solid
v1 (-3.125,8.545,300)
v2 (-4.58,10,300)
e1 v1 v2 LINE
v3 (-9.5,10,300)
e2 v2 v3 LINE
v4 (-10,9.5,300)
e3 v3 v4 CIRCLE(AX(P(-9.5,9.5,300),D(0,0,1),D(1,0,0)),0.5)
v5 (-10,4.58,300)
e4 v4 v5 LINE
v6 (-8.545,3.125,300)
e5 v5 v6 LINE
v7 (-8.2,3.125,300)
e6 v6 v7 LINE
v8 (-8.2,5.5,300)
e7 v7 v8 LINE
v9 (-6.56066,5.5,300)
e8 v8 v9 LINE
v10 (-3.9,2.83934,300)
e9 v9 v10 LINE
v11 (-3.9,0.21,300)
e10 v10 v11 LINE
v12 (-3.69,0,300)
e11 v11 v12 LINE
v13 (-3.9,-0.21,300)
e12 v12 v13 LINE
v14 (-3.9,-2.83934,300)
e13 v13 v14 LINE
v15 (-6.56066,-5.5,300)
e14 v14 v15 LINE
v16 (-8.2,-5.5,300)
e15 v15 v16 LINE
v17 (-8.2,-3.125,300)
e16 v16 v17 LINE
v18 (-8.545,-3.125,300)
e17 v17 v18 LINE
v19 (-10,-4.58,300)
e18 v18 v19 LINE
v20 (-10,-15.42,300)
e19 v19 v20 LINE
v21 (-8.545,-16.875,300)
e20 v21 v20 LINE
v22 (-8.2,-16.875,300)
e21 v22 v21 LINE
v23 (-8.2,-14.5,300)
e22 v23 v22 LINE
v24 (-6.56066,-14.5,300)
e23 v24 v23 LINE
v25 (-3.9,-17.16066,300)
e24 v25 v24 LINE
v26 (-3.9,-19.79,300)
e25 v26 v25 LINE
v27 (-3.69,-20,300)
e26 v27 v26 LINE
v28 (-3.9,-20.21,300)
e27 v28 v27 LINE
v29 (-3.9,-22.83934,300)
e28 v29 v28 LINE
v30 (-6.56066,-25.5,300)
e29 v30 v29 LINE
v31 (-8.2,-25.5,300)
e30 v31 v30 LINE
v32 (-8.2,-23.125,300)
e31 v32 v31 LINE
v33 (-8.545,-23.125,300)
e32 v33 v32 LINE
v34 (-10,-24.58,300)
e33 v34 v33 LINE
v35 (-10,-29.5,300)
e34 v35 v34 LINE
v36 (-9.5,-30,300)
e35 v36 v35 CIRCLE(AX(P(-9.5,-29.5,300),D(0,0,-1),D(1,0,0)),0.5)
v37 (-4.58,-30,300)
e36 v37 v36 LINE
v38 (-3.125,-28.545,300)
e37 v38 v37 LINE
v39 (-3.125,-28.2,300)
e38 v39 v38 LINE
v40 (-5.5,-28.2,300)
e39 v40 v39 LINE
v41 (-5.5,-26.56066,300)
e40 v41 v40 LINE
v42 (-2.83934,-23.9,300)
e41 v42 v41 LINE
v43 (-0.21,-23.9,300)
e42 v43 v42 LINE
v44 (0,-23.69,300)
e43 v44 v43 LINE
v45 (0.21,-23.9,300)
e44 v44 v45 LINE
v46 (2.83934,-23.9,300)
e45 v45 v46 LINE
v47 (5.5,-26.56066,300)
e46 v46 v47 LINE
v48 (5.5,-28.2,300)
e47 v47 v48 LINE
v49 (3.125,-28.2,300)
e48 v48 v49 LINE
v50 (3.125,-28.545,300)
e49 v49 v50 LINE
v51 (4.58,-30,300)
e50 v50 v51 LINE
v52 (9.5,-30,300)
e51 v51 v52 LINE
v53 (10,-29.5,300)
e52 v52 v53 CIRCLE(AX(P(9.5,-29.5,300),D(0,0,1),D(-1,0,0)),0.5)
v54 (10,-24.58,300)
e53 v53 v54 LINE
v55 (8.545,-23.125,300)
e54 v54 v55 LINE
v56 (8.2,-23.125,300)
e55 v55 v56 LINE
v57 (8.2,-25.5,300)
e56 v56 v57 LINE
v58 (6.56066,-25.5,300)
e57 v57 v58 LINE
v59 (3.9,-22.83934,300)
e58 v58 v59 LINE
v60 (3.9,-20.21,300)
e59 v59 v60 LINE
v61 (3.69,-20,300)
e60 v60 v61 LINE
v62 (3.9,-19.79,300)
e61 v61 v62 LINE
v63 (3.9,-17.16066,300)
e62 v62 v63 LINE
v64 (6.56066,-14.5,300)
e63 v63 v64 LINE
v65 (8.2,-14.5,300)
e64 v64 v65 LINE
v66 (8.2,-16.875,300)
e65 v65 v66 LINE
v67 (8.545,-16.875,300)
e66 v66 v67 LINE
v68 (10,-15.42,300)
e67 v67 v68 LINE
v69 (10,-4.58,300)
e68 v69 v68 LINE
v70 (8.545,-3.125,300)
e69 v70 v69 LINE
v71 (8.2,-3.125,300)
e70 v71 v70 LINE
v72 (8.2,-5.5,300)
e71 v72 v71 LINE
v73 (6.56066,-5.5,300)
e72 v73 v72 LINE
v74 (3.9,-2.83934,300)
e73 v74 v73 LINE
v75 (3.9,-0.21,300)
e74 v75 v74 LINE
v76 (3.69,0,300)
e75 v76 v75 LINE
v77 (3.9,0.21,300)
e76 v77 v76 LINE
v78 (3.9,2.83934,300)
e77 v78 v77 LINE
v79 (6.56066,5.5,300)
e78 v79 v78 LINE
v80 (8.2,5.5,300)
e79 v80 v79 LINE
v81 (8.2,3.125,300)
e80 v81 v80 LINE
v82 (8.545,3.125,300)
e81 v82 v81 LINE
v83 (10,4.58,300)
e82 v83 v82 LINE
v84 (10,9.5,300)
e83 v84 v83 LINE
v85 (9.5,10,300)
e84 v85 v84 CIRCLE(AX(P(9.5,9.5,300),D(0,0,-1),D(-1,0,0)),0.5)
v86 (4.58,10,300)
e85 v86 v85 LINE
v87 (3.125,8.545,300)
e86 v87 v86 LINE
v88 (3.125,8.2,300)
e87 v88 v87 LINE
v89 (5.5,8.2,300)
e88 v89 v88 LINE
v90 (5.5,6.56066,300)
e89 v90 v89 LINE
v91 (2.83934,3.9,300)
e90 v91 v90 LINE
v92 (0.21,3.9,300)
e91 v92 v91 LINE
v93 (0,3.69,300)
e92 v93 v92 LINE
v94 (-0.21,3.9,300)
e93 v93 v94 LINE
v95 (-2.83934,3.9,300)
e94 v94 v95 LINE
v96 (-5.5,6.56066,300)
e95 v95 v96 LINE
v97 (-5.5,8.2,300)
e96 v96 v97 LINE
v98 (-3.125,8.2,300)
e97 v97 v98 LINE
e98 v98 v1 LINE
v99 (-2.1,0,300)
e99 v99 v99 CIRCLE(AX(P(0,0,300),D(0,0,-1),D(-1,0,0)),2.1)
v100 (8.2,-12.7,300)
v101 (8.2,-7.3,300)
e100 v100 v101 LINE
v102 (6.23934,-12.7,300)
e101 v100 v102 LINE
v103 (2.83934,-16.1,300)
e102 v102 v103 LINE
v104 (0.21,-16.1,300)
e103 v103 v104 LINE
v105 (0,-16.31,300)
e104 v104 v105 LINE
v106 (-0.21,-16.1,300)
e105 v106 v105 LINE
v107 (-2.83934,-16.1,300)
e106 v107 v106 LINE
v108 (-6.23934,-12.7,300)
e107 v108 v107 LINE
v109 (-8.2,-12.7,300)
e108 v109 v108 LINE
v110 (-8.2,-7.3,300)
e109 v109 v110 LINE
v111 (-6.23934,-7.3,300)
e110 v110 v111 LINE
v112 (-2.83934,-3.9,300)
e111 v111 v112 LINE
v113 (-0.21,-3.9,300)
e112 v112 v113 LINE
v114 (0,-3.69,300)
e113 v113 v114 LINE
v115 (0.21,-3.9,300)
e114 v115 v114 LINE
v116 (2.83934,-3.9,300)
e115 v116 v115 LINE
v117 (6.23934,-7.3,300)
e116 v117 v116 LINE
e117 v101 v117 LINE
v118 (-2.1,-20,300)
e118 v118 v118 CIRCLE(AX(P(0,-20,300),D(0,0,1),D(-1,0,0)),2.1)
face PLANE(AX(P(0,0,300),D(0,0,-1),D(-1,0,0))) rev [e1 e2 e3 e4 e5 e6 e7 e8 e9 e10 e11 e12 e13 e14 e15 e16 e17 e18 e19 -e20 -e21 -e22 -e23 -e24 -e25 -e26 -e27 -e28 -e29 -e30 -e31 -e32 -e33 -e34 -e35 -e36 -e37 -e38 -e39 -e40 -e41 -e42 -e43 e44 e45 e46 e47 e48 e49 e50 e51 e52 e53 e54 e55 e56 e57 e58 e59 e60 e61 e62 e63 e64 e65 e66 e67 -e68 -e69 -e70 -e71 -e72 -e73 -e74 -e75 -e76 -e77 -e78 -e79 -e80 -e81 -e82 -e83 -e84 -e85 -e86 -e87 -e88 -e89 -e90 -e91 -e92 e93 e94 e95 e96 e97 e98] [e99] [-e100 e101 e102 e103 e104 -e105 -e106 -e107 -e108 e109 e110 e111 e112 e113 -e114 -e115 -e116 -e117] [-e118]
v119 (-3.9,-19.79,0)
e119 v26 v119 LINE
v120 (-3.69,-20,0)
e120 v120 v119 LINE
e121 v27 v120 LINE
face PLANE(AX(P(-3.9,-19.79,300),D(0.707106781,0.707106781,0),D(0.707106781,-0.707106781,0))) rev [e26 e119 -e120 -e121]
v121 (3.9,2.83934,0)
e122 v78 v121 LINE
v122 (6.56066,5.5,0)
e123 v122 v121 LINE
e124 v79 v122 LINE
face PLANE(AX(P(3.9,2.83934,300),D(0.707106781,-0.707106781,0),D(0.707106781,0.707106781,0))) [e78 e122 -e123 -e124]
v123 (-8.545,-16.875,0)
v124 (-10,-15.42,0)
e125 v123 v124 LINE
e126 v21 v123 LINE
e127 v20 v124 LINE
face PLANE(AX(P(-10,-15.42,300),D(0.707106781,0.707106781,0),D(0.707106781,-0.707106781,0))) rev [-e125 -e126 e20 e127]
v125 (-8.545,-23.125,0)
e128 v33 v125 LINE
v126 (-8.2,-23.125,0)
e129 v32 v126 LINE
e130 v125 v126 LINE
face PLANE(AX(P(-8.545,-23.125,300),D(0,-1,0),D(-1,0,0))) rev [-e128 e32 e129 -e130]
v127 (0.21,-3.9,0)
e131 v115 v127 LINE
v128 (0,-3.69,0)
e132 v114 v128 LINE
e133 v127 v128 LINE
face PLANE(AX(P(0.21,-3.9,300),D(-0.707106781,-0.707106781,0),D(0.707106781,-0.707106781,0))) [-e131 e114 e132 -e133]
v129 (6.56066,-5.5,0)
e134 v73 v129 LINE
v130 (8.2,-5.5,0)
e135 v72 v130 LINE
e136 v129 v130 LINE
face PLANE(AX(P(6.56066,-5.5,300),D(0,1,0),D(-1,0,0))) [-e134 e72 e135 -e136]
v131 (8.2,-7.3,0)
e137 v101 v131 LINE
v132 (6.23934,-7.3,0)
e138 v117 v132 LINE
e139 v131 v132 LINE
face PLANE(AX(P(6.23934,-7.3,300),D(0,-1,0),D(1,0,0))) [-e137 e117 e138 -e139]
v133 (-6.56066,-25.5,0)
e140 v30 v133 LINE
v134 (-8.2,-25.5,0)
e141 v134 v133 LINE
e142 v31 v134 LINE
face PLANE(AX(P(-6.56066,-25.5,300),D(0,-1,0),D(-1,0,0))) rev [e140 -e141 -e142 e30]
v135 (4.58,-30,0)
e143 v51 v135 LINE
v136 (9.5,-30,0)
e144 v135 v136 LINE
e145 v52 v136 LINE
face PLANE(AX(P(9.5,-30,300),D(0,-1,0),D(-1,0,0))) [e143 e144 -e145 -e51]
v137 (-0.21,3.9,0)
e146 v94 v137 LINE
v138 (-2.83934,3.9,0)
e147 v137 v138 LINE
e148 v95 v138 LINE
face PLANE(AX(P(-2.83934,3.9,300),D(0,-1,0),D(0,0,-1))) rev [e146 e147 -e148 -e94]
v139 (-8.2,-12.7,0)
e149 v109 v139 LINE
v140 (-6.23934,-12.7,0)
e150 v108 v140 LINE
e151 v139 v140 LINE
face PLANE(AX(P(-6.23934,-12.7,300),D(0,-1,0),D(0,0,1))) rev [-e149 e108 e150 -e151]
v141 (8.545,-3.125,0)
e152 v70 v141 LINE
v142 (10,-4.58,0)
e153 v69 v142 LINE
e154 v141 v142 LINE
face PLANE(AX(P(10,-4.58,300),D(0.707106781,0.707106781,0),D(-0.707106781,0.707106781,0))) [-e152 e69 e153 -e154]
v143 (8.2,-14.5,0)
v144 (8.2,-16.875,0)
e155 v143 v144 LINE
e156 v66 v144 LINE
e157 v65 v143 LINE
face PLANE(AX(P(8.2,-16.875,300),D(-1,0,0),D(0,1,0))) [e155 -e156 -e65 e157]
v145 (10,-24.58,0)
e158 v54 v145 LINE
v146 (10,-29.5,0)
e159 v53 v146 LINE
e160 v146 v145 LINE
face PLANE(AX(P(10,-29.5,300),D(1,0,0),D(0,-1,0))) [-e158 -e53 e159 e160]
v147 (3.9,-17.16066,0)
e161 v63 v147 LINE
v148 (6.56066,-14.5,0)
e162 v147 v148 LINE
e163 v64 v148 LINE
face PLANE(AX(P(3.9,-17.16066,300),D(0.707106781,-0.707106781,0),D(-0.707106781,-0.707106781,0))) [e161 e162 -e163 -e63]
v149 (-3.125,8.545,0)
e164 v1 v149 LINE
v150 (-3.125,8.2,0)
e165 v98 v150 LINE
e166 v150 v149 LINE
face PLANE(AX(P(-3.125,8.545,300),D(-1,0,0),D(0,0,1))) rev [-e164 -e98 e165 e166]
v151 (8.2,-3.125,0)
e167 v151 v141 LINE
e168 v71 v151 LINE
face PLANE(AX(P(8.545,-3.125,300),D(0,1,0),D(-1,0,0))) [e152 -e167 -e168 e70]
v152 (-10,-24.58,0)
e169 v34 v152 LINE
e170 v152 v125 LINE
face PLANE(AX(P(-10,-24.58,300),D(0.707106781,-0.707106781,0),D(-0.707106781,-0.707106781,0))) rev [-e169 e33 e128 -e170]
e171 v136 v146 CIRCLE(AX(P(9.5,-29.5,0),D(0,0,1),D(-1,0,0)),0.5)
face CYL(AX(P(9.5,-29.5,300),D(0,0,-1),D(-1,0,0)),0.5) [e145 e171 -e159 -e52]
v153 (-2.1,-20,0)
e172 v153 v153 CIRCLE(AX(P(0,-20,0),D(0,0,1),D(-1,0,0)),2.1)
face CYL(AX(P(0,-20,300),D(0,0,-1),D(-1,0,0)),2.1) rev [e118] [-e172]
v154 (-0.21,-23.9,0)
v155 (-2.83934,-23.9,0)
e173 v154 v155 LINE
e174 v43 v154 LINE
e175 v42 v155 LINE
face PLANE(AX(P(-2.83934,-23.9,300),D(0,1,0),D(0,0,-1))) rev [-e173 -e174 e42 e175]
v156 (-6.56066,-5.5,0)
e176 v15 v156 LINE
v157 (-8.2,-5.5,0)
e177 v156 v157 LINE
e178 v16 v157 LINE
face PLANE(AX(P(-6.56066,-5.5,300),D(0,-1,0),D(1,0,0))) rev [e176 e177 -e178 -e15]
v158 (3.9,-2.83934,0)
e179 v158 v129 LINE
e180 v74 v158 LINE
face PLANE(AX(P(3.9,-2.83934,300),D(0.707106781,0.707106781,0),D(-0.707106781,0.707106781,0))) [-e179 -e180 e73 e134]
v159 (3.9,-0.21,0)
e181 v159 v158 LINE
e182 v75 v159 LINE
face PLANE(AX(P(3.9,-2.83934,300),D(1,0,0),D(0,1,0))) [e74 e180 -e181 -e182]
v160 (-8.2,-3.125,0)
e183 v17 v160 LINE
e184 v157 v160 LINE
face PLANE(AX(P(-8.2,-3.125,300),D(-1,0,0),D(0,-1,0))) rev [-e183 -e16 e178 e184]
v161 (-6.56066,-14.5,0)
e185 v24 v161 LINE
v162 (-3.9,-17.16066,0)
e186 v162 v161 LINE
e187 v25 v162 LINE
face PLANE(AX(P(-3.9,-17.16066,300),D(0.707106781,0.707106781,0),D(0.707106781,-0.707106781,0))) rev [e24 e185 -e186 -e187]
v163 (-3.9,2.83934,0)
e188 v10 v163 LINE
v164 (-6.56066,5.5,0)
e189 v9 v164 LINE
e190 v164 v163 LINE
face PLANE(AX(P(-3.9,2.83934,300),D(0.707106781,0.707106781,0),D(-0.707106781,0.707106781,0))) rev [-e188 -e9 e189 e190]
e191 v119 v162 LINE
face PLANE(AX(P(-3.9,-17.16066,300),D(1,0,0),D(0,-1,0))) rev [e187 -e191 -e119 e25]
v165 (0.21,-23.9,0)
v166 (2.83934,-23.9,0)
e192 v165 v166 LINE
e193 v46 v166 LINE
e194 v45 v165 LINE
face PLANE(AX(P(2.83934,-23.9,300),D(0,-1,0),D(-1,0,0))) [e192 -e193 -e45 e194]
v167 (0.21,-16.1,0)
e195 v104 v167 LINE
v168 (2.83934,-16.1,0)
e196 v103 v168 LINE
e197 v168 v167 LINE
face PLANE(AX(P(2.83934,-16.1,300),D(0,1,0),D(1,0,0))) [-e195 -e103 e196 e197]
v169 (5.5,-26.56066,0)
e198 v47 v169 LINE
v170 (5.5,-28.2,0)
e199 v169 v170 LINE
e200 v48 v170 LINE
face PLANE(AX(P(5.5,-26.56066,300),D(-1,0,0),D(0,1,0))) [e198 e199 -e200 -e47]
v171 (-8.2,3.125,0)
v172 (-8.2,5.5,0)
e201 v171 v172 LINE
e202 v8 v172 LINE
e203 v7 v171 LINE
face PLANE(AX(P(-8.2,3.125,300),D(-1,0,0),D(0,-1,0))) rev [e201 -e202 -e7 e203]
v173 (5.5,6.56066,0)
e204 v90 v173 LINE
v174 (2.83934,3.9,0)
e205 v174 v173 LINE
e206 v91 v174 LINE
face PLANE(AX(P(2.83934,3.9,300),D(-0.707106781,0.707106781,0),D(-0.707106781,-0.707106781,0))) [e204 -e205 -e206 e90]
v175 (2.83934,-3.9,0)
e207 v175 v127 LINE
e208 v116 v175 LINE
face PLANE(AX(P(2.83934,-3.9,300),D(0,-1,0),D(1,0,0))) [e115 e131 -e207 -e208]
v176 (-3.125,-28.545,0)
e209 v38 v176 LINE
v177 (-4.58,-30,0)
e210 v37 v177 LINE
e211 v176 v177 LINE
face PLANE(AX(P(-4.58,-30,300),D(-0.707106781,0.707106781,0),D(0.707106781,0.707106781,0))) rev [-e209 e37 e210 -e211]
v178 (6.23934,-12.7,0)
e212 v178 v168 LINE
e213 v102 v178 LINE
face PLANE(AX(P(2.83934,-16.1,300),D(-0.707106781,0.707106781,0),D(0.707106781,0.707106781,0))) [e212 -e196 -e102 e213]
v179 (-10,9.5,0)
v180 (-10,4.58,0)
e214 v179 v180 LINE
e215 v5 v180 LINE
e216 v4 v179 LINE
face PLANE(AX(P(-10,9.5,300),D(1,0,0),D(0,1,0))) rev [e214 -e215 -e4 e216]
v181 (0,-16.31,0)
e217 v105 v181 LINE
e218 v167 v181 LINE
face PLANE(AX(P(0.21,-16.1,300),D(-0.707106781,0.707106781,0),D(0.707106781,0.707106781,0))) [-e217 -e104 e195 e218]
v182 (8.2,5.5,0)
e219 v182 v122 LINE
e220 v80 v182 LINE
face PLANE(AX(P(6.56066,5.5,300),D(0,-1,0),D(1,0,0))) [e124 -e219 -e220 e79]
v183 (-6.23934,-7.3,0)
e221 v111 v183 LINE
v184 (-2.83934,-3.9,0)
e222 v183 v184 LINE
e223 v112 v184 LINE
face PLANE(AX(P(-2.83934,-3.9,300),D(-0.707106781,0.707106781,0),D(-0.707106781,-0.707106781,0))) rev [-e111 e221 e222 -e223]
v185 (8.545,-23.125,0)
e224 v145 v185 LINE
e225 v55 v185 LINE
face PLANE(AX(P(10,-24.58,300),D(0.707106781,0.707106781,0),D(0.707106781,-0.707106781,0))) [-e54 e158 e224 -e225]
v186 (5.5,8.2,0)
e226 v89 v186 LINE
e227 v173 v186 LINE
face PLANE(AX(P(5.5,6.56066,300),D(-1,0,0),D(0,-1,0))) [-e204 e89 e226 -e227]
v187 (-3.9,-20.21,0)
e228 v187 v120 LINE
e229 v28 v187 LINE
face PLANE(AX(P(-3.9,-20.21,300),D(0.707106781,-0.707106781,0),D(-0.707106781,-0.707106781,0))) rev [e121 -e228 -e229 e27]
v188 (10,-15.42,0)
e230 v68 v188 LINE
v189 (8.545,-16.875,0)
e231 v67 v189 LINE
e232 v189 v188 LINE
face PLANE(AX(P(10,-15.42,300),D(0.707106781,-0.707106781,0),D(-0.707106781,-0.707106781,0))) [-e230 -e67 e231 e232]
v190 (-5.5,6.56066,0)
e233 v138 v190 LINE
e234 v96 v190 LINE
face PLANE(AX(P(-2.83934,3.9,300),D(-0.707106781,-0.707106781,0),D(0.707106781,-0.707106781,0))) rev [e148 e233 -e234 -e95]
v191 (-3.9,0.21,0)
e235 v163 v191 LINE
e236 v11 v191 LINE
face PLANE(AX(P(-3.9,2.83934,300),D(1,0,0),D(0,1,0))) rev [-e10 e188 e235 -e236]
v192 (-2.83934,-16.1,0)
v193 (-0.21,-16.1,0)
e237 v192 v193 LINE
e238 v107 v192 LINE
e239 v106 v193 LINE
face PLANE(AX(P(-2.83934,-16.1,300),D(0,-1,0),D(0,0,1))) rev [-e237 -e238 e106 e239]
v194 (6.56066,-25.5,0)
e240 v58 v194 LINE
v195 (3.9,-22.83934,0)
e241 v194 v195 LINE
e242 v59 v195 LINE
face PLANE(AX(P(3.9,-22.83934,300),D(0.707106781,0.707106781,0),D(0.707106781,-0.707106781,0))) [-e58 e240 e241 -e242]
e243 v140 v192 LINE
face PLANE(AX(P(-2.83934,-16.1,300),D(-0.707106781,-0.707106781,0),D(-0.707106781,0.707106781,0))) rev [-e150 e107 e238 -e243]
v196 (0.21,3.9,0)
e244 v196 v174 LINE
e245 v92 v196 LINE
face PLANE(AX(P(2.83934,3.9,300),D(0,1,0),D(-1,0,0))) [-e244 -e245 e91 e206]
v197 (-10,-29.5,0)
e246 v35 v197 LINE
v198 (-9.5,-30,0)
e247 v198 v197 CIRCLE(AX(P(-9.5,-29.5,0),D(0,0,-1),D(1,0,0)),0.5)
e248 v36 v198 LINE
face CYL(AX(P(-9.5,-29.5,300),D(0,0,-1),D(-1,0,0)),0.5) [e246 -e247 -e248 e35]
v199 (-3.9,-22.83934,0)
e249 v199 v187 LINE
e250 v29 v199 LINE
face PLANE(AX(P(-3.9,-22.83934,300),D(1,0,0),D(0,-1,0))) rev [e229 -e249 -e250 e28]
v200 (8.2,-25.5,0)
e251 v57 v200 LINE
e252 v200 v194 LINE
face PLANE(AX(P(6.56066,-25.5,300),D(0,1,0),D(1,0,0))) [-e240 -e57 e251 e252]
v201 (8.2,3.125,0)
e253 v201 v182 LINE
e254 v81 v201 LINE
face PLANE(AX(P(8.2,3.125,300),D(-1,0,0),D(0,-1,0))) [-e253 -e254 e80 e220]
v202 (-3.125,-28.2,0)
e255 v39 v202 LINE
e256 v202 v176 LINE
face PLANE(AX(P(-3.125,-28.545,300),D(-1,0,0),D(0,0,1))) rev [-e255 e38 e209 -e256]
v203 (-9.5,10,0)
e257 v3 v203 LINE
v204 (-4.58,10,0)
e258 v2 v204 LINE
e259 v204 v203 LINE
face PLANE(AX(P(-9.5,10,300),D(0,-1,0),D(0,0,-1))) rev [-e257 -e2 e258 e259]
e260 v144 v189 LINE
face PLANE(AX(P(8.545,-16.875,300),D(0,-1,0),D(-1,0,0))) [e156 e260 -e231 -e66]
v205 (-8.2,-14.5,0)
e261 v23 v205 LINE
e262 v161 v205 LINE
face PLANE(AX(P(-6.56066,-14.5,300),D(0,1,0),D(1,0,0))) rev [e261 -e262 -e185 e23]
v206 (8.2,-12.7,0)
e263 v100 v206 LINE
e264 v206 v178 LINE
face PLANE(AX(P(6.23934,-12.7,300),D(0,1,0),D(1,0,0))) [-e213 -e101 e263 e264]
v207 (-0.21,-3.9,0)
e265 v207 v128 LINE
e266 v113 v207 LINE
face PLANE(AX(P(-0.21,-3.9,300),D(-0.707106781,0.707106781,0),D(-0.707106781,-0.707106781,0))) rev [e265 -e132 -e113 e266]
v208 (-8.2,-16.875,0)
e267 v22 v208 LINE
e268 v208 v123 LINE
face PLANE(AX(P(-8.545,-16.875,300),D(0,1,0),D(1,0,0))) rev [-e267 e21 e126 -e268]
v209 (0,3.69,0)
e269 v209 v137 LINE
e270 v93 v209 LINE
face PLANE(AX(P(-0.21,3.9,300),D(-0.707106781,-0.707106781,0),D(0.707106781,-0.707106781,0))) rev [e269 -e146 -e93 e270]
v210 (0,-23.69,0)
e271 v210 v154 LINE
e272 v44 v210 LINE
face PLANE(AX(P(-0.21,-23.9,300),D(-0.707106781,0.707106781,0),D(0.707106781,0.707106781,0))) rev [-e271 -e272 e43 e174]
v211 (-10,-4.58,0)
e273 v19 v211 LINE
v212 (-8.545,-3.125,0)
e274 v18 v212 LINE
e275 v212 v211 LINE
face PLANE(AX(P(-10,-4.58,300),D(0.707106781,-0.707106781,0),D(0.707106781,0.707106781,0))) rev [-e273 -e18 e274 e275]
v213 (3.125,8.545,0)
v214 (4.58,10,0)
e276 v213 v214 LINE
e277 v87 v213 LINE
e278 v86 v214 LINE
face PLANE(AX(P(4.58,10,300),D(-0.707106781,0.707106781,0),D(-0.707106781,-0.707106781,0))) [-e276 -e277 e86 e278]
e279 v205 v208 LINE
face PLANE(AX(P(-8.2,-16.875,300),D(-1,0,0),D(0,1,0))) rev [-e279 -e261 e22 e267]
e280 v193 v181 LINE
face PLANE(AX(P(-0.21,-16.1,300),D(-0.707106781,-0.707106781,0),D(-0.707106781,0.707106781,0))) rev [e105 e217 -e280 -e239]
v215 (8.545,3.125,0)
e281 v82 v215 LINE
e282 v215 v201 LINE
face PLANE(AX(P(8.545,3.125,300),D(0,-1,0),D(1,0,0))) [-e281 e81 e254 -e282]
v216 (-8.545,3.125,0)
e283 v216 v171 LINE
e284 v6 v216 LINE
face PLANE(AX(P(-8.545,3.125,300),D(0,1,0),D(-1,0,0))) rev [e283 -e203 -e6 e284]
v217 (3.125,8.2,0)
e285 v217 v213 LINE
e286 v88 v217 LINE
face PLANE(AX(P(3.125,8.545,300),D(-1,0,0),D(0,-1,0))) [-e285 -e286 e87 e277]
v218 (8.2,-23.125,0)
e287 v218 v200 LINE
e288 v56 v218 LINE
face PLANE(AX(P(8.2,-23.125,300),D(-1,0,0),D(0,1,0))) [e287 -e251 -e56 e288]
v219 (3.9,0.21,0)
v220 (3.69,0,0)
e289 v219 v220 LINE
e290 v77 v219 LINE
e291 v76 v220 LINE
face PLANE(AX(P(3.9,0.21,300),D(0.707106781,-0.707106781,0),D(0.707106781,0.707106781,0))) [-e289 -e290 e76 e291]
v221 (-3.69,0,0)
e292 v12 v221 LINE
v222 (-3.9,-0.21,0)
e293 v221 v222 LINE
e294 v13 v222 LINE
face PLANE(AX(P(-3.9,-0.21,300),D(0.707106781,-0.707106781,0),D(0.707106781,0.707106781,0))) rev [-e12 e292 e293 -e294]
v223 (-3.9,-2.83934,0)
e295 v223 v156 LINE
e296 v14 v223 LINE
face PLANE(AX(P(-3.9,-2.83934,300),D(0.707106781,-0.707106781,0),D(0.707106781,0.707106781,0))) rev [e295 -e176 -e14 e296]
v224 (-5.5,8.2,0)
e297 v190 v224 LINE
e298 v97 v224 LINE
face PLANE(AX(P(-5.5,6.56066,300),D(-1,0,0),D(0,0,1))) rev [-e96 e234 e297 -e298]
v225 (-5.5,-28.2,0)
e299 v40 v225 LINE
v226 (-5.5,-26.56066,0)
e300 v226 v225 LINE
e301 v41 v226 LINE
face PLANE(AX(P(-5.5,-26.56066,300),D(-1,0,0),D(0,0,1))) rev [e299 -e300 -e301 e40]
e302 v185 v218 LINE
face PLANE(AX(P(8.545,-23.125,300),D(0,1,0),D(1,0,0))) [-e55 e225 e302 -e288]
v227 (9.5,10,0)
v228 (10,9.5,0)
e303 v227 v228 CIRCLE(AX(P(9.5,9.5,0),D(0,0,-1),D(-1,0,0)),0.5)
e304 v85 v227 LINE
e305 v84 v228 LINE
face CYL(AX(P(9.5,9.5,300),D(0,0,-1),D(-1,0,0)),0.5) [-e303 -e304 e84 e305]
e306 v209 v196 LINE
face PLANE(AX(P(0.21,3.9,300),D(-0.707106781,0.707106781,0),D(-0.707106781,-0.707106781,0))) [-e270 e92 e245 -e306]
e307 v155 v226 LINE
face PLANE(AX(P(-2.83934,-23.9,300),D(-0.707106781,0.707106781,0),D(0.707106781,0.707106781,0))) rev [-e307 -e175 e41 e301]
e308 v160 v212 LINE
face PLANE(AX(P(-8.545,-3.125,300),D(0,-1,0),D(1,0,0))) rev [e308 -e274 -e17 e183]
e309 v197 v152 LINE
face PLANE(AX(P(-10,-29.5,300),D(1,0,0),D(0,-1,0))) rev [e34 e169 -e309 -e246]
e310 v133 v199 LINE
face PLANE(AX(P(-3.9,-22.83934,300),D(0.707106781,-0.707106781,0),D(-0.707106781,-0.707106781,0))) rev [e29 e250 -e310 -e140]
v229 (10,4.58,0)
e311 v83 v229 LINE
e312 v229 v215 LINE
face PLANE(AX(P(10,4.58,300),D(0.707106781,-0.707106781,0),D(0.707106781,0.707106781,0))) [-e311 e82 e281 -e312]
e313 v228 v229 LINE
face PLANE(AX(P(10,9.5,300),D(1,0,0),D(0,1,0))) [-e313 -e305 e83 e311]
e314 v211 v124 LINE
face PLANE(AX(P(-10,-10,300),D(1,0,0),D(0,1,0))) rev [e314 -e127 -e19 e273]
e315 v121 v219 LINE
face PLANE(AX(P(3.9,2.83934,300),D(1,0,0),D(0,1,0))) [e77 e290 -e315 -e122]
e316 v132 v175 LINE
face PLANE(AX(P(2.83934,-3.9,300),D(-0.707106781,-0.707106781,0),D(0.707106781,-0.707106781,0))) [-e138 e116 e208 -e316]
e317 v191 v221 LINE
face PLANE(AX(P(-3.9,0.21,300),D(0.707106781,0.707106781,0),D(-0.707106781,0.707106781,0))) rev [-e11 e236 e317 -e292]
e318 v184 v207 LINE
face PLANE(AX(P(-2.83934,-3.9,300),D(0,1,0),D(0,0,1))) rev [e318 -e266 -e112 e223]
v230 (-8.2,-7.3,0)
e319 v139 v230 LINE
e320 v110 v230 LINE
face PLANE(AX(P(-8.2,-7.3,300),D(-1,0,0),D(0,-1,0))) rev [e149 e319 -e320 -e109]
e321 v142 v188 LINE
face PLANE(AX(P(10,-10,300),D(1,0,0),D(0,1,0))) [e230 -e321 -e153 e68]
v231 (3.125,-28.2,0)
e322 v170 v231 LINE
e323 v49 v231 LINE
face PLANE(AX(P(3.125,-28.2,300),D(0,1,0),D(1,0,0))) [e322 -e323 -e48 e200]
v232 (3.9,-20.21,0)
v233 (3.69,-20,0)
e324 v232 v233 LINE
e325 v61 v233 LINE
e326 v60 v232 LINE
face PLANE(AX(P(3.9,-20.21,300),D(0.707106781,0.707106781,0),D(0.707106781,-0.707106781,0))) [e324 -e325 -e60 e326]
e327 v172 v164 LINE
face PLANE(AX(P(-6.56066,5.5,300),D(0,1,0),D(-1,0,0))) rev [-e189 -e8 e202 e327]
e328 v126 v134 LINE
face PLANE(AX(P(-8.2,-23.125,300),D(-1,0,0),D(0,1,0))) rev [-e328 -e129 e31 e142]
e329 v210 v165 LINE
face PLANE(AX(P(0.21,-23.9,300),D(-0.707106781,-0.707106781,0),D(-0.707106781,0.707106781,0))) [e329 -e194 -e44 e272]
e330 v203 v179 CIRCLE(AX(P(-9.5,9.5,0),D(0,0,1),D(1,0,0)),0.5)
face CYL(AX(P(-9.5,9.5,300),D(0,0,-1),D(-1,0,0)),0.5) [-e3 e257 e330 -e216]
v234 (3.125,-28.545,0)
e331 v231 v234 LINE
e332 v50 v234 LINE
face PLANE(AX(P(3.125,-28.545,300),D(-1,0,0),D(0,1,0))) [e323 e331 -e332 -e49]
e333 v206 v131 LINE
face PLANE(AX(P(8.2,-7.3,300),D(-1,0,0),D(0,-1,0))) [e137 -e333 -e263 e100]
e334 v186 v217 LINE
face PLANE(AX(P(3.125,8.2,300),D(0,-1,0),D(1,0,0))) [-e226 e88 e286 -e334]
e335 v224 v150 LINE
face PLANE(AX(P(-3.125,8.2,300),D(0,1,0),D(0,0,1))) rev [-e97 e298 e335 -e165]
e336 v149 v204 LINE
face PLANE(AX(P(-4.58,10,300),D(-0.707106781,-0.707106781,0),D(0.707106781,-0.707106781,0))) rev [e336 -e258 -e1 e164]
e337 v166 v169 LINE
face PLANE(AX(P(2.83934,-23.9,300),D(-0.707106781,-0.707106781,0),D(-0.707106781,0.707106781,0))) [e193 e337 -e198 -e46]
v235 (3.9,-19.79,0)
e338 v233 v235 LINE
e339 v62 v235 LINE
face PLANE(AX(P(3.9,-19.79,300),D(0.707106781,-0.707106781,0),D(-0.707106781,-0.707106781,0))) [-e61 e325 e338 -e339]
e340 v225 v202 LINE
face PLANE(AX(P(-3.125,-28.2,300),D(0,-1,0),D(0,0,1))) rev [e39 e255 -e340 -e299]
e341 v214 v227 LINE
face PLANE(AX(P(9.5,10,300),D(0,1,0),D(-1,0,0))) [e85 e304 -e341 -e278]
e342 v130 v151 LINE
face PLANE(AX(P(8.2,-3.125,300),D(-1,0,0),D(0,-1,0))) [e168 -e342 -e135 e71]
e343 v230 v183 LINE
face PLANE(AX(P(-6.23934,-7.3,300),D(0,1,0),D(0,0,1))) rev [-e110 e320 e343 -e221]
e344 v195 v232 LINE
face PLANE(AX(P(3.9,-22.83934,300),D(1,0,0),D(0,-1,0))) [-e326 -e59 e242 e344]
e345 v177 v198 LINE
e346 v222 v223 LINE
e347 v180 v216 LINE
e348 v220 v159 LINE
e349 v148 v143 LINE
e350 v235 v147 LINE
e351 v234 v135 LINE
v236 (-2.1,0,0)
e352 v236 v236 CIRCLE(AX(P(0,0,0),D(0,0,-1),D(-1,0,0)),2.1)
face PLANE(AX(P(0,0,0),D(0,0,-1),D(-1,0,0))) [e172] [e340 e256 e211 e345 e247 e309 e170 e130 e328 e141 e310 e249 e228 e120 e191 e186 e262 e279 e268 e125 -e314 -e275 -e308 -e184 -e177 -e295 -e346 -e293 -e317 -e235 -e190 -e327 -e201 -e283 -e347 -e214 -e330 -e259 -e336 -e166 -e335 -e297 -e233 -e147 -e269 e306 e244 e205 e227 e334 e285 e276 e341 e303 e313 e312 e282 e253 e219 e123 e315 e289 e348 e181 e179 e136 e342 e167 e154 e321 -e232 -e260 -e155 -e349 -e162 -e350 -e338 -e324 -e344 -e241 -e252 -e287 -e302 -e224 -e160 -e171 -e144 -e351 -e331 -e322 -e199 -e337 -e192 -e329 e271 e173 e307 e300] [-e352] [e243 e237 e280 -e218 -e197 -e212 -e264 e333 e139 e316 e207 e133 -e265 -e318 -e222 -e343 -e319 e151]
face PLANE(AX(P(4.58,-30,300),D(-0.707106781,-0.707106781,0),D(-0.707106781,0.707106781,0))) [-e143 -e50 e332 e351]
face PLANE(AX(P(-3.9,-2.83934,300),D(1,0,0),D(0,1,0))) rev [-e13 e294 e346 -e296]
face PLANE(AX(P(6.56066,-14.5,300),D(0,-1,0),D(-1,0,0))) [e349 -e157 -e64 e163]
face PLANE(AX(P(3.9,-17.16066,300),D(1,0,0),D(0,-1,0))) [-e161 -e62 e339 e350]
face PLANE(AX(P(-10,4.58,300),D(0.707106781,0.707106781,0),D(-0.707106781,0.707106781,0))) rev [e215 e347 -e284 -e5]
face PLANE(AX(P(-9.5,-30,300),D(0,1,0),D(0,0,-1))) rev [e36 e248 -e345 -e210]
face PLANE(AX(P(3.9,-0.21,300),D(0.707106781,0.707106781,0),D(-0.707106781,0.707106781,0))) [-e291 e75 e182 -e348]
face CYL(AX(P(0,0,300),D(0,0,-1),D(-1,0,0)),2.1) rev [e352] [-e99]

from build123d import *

# Parameters (mm, degrees)
BOSS_EXTRU_1_DEPTH  = 300
SYM_TRIE6_OUTLINE_R = 2.1
SYM_TRIE6_DEPTH     = 300


# Read off the part's stored shape, not the designer's step: Symétrie6
with BuildPart() as part:
    # Esquisse1 → Boss.-Extru.1 (new body)
    with BuildSketch(Plane.XY):
        with BuildLine():
            Line((-9.5, 10), (-4.58, 10))
            Line((-4.58, 10), (-3.125, 8.545))
            Line((-3.125, 8.545), (-3.125, 8.2))
            Line((-3.125, 8.2), (-5.5, 8.2))
            Line((-5.5, 8.2), (-5.5, 6.560660172))
            Line((-5.5, 6.560660172), (-2.839339828, 3.9))
            Line((-2.839339828, 3.9), (-0.21, 3.9))
            Line((-0.21, 3.9), (0, 3.69))
            Line((0, 3.69), (0, 2.1))
            ThreePointArc((0, 2.1), (-2.1, 0), (0, -2.1))
            Line((0, -2.1), (0, -3.69))
            Line((0, -3.69), (-0.21, -3.9))
            Line((-0.21, -3.9), (-2.839339828, -3.9))
            Line((-2.839339828, -3.9), (-6.239339828, -7.3))
            Line((-6.239339828, -7.3), (-8.2, -7.3))
            Line((-8.2, -7.3), (-8.2, -10))
            Line((-8.2, -10), (-10, -10))
            Line((-10, -10), (-10, -4.58))
            Line((-10, -4.58), (-8.545, -3.125))
            Line((-8.545, -3.125), (-8.2, -3.125))
            Line((-8.2, -3.125), (-8.2, -5.5))
            Line((-8.2, -5.5), (-6.560660172, -5.5))
            Line((-6.560660172, -5.5), (-3.9, -2.839339828))
            Line((-3.9, -2.839339828), (-3.9, -0.21))
            Line((-3.9, -0.21), (-3.69, 0))
            Line((-3.69, 0), (-3.9, 0.21))
            Line((-3.9, 0.21), (-3.9, 2.839339828))
            Line((-3.9, 2.839339828), (-6.560660172, 5.5))
            Line((-6.560660172, 5.5), (-8.2, 5.5))
            Line((-8.2, 5.5), (-8.2, 3.125))
            Line((-8.2, 3.125), (-8.545, 3.125))
            Line((-8.545, 3.125), (-10, 4.58))
            Line((-10, 4.58), (-10, 9.5))
            ThreePointArc((-10, 9.5), (-9.853553391, 9.853553391), (-9.5, 10))
        make_face()
    boss_extru_1 = extrude(amount=BOSS_EXTRU_1_DEPTH)

    # Symétrie1: Boss.-Extru.1 across Right Plane
    add(boss_extru_1.mirror(Plane(origin=(0, 0, 0), x_dir=(0, 0, -1), z_dir=(1, 0, 0))))

    # Symétrie6 outline → Symétrie6 (add)
    with BuildSketch(Plane.XY):
        with BuildLine():
            Line((-3.9, -17.160660172), (-3.9, -19.79))
            Line((-3.9, -19.79), (-3.69, -20))
            Line((-3.69, -20), (-3.9, -20.21))
            Line((-3.9, -20.21), (-3.9, -22.839339828))
            Line((-3.9, -22.839339828), (-6.560660172, -25.5))
            Line((-6.560660172, -25.5), (-8.2, -25.5))
            Line((-8.2, -25.5), (-8.2, -23.125))
            Line((-8.2, -23.125), (-8.545, -23.125))
            Line((-8.545, -23.125), (-10, -24.58))
            Line((-10, -24.58), (-10, -29.5))
            ThreePointArc((-10, -29.5), (-9.853553391, -29.853553391), (-9.5, -30))
            Line((-9.5, -30), (-4.58, -30))
            Line((-4.58, -30), (-3.125, -28.545))
            Line((-3.125, -28.545), (-3.125, -28.2))
            Line((-3.125, -28.2), (-5.5, -28.2))
            Line((-5.5, -28.2), (-5.5, -26.560660172))
            Line((-5.5, -26.560660172), (-2.839339828, -23.9))
            Line((-2.839339828, -23.9), (-0.21, -23.9))
            Line((-0.21, -23.9), (0, -23.69))
            Line((0, -23.69), (0.21, -23.9))
            Line((0.21, -23.9), (2.839339828, -23.9))
            Line((2.839339828, -23.9), (5.5, -26.560660172))
            Line((5.5, -26.560660172), (5.5, -28.2))
            Line((5.5, -28.2), (3.125, -28.2))
            Line((3.125, -28.2), (3.125, -28.545))
            Line((3.125, -28.545), (4.58, -30))
            Line((4.58, -30), (9.5, -30))
            ThreePointArc((9.5, -30), (9.853553391, -29.853553391), (10, -29.5))
            Line((10, -29.5), (10, -24.58))
            Line((10, -24.58), (8.545, -23.125))
            Line((8.545, -23.125), (8.2, -23.125))
            Line((8.2, -23.125), (8.2, -25.5))
            Line((8.2, -25.5), (6.560660172, -25.5))
            Line((6.560660172, -25.5), (3.9, -22.839339828))
            Line((3.9, -22.839339828), (3.9, -20.21))
            Line((3.9, -20.21), (3.69, -20))
            Line((3.69, -20), (3.9, -19.79))
            Line((3.9, -19.79), (3.9, -17.160660172))
            Line((3.9, -17.160660172), (6.560660172, -14.5))
            Line((6.560660172, -14.5), (8.2, -14.5))
            Line((8.2, -14.5), (8.2, -16.875))
            Line((8.2, -16.875), (8.545, -16.875))
            Line((8.545, -16.875), (10, -15.42))
            Line((10, -15.42), (10, -10))
            Line((10, -10), (8.2, -10))
            Line((8.2, -10), (8.2, -12.7))
            Line((8.2, -12.7), (6.239339828, -12.7))
            Line((6.239339828, -12.7), (2.839339828, -16.1))
            Line((2.839339828, -16.1), (0.21, -16.1))
            Line((0.21, -16.1), (0, -16.31))
            Line((0, -16.31), (-0.21, -16.1))
            Line((-0.21, -16.1), (-2.839339828, -16.1))
            Line((-2.839339828, -16.1), (-6.239339828, -12.7))
            Line((-6.239339828, -12.7), (-8.2, -12.7))
            Line((-8.2, -12.7), (-8.2, -10))
            Line((-8.2, -10), (-10, -10))
            Line((-10, -10), (-10, -15.42))
            Line((-10, -15.42), (-8.545, -16.875))
            Line((-8.545, -16.875), (-8.2, -16.875))
            Line((-8.2, -16.875), (-8.2, -14.5))
            Line((-8.2, -14.5), (-6.560660172, -14.5))
            Line((-6.560660172, -14.5), (-3.9, -17.160660172))
        make_face()
        with Locations((0, -20)):
            Circle(SYM_TRIE6_OUTLINE_R, mode=Mode.SUBTRACT)
    extrude(amount=SYM_TRIE6_DEPTH)


solid = part.part
